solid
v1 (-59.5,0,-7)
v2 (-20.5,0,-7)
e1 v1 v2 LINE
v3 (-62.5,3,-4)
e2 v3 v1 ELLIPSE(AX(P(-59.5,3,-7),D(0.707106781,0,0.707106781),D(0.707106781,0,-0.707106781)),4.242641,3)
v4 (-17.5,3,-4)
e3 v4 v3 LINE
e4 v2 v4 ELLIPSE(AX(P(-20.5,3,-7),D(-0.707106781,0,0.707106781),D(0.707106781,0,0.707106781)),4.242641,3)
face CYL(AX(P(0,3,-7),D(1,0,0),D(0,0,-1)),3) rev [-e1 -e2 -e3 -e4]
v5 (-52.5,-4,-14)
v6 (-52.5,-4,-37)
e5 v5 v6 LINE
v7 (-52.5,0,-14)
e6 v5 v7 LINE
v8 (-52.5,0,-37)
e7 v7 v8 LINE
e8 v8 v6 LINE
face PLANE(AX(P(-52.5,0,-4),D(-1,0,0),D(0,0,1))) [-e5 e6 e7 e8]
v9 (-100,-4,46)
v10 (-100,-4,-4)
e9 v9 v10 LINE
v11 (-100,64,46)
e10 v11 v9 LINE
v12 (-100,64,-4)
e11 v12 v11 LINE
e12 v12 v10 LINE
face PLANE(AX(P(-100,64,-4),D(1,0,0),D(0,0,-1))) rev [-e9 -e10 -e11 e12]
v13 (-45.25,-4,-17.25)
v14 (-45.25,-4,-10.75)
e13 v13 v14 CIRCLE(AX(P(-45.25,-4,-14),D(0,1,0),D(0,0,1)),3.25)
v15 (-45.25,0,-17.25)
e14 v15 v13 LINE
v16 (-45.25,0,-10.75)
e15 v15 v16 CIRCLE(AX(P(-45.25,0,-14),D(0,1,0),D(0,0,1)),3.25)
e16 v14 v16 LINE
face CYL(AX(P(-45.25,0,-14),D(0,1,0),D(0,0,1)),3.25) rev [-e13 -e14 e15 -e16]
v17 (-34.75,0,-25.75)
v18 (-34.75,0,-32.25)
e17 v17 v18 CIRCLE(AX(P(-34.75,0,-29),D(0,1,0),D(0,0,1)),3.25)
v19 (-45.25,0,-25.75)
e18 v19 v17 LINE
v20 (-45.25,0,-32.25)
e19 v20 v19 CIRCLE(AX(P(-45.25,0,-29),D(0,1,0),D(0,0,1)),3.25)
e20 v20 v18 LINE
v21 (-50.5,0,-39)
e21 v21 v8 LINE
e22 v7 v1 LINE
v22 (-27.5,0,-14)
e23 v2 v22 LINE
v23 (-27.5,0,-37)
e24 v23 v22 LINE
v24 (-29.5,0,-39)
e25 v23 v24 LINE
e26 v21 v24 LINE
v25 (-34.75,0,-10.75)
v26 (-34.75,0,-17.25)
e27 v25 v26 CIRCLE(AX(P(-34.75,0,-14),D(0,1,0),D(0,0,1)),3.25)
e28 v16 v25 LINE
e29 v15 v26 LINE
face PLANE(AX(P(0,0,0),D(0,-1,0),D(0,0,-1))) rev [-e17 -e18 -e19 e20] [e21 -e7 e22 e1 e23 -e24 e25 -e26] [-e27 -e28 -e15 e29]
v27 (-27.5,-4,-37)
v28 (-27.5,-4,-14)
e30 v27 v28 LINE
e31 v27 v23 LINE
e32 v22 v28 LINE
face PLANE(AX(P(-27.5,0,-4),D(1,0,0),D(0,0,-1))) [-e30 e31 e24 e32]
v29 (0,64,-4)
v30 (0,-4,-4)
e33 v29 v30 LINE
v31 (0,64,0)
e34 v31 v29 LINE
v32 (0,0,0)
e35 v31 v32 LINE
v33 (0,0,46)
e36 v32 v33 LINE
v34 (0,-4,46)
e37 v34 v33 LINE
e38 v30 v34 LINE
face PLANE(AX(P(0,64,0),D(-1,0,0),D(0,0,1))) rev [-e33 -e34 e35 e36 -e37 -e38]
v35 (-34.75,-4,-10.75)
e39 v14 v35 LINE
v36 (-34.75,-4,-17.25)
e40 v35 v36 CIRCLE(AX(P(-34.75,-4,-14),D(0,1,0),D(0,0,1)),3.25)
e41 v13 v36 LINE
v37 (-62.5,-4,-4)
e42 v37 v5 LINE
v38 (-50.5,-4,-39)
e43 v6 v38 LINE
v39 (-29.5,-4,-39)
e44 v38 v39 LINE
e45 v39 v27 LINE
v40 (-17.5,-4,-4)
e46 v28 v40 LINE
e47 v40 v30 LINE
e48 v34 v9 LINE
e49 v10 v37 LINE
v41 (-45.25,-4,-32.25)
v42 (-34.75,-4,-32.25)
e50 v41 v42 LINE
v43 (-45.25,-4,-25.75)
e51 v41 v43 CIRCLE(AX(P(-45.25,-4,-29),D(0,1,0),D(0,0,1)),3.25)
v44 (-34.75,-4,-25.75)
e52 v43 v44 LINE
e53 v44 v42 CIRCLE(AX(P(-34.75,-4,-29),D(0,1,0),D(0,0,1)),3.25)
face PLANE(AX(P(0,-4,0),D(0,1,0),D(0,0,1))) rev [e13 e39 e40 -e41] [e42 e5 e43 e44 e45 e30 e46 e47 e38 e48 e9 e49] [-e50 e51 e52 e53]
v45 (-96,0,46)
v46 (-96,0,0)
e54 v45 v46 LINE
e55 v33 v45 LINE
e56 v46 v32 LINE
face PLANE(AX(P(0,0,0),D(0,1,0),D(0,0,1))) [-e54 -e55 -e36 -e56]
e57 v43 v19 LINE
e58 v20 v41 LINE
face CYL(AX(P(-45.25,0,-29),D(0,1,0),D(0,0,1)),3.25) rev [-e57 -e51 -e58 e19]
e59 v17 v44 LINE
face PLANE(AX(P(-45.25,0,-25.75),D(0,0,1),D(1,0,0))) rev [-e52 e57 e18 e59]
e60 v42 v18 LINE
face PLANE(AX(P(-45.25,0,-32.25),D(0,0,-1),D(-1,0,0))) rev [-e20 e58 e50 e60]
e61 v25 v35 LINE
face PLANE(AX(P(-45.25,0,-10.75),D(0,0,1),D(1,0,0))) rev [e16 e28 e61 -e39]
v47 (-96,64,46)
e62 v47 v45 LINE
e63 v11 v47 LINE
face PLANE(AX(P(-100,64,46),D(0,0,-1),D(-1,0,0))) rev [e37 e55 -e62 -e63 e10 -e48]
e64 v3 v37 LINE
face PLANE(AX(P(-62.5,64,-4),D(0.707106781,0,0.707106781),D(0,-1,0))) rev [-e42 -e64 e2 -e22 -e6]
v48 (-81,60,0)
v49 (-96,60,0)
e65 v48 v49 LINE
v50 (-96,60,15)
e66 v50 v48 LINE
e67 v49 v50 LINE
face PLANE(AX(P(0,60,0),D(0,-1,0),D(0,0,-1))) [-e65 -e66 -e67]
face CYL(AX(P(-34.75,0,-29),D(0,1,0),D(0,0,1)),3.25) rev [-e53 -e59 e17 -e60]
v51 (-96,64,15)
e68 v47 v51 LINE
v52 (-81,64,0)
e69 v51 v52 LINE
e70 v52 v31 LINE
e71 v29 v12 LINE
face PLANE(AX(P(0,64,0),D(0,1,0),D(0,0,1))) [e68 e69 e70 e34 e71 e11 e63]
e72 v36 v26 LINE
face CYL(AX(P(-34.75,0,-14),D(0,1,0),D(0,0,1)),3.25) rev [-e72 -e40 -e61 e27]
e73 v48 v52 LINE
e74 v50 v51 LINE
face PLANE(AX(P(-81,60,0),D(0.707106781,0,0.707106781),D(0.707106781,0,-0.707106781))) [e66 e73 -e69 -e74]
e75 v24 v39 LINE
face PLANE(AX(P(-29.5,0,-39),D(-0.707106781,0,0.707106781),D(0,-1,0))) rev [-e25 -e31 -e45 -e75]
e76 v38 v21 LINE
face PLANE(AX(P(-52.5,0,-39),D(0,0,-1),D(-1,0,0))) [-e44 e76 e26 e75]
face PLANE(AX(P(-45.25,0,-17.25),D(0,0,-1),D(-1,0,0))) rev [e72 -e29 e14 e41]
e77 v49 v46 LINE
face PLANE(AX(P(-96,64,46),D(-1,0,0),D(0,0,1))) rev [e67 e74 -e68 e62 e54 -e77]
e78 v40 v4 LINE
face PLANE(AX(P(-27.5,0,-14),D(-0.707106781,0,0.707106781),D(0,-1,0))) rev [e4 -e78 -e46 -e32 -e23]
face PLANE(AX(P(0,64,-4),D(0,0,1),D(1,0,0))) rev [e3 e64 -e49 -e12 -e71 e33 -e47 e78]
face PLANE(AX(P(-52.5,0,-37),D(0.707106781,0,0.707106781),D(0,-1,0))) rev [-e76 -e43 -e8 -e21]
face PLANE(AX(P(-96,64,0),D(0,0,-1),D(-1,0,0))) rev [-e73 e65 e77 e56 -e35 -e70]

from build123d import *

# Parameters (mm, degrees)
BOSS_EXTRUDE1_DEPTH       = 64
SKETCH2_W                 = 100
SKETCH2_H                 = 50
BOSS_EXTRUDE2_DEPTH       = 4
BOSS_EXTRUDE3_DEPTH       = 4
SKETCH4_W                 = 25
SKETCH4_H                 = 35
BOSS_EXTRUDE4_DEPTH       = 4
F_6_0MM_START             = -4
F_6_0MM_DOWEL_SLOT1_DEPTH = 4
CHAMFER1_SIZE             = 10
CHAMFER2_SIZE             = 2
FILLET1_R                 = 3


# Read off the part's stored shape, not the designer's step: Ø6.0mm Dowel Slot1
with BuildPart() as part:
    # Sketch1 → Boss-Extrude1 (new body)
    with BuildSketch(Plane(origin=(0, 0, 0), x_dir=(1, 0, 0), z_dir=(0, 1, 0))):
        Polygon((0, 0), (0, 4), (-100, 4), (-100, -46), (-96, -46), (-96, 0), align=None)
    extrude(amount=BOSS_EXTRUDE1_DEPTH)

    # Sketch2 → Boss-Extrude2 (add)
    with BuildSketch(Plane.XZ):
        with Locations((-50, 21)):
            Rectangle(SKETCH2_W, SKETCH2_H)
    extrude(amount=BOSS_EXTRUDE2_DEPTH)

    # Sketch3 → Boss-Extrude3 (add)
    with BuildSketch(Plane(origin=(0, 64, 0), x_dir=(1, 0, 0), z_dir=(0, 1, 0))):
        Polygon((-96, 0), (-81, 0), (-96, -15), align=None)
    extrude(amount=-BOSS_EXTRUDE3_DEPTH)

    # Sketch4 → Boss-Extrude4 (add)
    with BuildSketch(Plane.XZ.offset(4)):
        with Locations((-40, -21.5)):
            Rectangle(SKETCH4_W, SKETCH4_H)
    extrude(amount=-BOSS_EXTRUDE4_DEPTH)

    # Ø6.0mm Dowel Slot1 outline → Ø6.0mm Dowel Slot1 (cut)
    with BuildSketch(Plane(origin=(0, 0, 0), x_dir=(1, 0, 0), z_dir=(0, 1, 0)).offset(F_6_0MM_START)):
        with BuildLine():
            Line((-45.25, 10.75), (-34.75, 10.75))
            ThreePointArc((-34.75, 10.75), (-31.5, 14), (-34.75, 17.25))
            Line((-34.75, 17.25), (-45.25, 17.25))
            ThreePointArc((-45.25, 17.25), (-48.5, 14), (-45.25, 10.75))
        make_face()
        with BuildLine():
            Line((-45.25, 25.75), (-34.75, 25.75))
            ThreePointArc((-34.75, 25.75), (-31.5, 29), (-34.75, 32.25))
            Line((-34.75, 32.25), (-45.25, 32.25))
            ThreePointArc((-45.25, 32.25), (-48.5, 29), (-45.25, 25.75))
        make_face()
    extrude(amount=F_6_0MM_DOWEL_SLOT1_DEPTH, mode=Mode.SUBTRACT)

    # Chamfer1
    chamfer1_edges = [part.edges().sort_by_distance(p)[0] for p in [
        (-52.5, -2, -4),
        (-27.5, -2, -4),
    ]]
    chamfer(chamfer1_edges, length=CHAMFER1_SIZE)

    # Chamfer2
    chamfer2_edges = [part.edges().sort_by_distance(p)[0] for p in [
        (-52.5, -2, -39),
        (-27.5, -2, -39),
    ]]
    chamfer(chamfer2_edges, length=CHAMFER2_SIZE)

    # Fillet1
    fillet1_edges = [part.edges().sort_by_distance(p)[0] for p in [
        (-40, 0, -4),
    ]]
    fillet(fillet1_edges, radius=FILLET1_R)


solid = part.part
